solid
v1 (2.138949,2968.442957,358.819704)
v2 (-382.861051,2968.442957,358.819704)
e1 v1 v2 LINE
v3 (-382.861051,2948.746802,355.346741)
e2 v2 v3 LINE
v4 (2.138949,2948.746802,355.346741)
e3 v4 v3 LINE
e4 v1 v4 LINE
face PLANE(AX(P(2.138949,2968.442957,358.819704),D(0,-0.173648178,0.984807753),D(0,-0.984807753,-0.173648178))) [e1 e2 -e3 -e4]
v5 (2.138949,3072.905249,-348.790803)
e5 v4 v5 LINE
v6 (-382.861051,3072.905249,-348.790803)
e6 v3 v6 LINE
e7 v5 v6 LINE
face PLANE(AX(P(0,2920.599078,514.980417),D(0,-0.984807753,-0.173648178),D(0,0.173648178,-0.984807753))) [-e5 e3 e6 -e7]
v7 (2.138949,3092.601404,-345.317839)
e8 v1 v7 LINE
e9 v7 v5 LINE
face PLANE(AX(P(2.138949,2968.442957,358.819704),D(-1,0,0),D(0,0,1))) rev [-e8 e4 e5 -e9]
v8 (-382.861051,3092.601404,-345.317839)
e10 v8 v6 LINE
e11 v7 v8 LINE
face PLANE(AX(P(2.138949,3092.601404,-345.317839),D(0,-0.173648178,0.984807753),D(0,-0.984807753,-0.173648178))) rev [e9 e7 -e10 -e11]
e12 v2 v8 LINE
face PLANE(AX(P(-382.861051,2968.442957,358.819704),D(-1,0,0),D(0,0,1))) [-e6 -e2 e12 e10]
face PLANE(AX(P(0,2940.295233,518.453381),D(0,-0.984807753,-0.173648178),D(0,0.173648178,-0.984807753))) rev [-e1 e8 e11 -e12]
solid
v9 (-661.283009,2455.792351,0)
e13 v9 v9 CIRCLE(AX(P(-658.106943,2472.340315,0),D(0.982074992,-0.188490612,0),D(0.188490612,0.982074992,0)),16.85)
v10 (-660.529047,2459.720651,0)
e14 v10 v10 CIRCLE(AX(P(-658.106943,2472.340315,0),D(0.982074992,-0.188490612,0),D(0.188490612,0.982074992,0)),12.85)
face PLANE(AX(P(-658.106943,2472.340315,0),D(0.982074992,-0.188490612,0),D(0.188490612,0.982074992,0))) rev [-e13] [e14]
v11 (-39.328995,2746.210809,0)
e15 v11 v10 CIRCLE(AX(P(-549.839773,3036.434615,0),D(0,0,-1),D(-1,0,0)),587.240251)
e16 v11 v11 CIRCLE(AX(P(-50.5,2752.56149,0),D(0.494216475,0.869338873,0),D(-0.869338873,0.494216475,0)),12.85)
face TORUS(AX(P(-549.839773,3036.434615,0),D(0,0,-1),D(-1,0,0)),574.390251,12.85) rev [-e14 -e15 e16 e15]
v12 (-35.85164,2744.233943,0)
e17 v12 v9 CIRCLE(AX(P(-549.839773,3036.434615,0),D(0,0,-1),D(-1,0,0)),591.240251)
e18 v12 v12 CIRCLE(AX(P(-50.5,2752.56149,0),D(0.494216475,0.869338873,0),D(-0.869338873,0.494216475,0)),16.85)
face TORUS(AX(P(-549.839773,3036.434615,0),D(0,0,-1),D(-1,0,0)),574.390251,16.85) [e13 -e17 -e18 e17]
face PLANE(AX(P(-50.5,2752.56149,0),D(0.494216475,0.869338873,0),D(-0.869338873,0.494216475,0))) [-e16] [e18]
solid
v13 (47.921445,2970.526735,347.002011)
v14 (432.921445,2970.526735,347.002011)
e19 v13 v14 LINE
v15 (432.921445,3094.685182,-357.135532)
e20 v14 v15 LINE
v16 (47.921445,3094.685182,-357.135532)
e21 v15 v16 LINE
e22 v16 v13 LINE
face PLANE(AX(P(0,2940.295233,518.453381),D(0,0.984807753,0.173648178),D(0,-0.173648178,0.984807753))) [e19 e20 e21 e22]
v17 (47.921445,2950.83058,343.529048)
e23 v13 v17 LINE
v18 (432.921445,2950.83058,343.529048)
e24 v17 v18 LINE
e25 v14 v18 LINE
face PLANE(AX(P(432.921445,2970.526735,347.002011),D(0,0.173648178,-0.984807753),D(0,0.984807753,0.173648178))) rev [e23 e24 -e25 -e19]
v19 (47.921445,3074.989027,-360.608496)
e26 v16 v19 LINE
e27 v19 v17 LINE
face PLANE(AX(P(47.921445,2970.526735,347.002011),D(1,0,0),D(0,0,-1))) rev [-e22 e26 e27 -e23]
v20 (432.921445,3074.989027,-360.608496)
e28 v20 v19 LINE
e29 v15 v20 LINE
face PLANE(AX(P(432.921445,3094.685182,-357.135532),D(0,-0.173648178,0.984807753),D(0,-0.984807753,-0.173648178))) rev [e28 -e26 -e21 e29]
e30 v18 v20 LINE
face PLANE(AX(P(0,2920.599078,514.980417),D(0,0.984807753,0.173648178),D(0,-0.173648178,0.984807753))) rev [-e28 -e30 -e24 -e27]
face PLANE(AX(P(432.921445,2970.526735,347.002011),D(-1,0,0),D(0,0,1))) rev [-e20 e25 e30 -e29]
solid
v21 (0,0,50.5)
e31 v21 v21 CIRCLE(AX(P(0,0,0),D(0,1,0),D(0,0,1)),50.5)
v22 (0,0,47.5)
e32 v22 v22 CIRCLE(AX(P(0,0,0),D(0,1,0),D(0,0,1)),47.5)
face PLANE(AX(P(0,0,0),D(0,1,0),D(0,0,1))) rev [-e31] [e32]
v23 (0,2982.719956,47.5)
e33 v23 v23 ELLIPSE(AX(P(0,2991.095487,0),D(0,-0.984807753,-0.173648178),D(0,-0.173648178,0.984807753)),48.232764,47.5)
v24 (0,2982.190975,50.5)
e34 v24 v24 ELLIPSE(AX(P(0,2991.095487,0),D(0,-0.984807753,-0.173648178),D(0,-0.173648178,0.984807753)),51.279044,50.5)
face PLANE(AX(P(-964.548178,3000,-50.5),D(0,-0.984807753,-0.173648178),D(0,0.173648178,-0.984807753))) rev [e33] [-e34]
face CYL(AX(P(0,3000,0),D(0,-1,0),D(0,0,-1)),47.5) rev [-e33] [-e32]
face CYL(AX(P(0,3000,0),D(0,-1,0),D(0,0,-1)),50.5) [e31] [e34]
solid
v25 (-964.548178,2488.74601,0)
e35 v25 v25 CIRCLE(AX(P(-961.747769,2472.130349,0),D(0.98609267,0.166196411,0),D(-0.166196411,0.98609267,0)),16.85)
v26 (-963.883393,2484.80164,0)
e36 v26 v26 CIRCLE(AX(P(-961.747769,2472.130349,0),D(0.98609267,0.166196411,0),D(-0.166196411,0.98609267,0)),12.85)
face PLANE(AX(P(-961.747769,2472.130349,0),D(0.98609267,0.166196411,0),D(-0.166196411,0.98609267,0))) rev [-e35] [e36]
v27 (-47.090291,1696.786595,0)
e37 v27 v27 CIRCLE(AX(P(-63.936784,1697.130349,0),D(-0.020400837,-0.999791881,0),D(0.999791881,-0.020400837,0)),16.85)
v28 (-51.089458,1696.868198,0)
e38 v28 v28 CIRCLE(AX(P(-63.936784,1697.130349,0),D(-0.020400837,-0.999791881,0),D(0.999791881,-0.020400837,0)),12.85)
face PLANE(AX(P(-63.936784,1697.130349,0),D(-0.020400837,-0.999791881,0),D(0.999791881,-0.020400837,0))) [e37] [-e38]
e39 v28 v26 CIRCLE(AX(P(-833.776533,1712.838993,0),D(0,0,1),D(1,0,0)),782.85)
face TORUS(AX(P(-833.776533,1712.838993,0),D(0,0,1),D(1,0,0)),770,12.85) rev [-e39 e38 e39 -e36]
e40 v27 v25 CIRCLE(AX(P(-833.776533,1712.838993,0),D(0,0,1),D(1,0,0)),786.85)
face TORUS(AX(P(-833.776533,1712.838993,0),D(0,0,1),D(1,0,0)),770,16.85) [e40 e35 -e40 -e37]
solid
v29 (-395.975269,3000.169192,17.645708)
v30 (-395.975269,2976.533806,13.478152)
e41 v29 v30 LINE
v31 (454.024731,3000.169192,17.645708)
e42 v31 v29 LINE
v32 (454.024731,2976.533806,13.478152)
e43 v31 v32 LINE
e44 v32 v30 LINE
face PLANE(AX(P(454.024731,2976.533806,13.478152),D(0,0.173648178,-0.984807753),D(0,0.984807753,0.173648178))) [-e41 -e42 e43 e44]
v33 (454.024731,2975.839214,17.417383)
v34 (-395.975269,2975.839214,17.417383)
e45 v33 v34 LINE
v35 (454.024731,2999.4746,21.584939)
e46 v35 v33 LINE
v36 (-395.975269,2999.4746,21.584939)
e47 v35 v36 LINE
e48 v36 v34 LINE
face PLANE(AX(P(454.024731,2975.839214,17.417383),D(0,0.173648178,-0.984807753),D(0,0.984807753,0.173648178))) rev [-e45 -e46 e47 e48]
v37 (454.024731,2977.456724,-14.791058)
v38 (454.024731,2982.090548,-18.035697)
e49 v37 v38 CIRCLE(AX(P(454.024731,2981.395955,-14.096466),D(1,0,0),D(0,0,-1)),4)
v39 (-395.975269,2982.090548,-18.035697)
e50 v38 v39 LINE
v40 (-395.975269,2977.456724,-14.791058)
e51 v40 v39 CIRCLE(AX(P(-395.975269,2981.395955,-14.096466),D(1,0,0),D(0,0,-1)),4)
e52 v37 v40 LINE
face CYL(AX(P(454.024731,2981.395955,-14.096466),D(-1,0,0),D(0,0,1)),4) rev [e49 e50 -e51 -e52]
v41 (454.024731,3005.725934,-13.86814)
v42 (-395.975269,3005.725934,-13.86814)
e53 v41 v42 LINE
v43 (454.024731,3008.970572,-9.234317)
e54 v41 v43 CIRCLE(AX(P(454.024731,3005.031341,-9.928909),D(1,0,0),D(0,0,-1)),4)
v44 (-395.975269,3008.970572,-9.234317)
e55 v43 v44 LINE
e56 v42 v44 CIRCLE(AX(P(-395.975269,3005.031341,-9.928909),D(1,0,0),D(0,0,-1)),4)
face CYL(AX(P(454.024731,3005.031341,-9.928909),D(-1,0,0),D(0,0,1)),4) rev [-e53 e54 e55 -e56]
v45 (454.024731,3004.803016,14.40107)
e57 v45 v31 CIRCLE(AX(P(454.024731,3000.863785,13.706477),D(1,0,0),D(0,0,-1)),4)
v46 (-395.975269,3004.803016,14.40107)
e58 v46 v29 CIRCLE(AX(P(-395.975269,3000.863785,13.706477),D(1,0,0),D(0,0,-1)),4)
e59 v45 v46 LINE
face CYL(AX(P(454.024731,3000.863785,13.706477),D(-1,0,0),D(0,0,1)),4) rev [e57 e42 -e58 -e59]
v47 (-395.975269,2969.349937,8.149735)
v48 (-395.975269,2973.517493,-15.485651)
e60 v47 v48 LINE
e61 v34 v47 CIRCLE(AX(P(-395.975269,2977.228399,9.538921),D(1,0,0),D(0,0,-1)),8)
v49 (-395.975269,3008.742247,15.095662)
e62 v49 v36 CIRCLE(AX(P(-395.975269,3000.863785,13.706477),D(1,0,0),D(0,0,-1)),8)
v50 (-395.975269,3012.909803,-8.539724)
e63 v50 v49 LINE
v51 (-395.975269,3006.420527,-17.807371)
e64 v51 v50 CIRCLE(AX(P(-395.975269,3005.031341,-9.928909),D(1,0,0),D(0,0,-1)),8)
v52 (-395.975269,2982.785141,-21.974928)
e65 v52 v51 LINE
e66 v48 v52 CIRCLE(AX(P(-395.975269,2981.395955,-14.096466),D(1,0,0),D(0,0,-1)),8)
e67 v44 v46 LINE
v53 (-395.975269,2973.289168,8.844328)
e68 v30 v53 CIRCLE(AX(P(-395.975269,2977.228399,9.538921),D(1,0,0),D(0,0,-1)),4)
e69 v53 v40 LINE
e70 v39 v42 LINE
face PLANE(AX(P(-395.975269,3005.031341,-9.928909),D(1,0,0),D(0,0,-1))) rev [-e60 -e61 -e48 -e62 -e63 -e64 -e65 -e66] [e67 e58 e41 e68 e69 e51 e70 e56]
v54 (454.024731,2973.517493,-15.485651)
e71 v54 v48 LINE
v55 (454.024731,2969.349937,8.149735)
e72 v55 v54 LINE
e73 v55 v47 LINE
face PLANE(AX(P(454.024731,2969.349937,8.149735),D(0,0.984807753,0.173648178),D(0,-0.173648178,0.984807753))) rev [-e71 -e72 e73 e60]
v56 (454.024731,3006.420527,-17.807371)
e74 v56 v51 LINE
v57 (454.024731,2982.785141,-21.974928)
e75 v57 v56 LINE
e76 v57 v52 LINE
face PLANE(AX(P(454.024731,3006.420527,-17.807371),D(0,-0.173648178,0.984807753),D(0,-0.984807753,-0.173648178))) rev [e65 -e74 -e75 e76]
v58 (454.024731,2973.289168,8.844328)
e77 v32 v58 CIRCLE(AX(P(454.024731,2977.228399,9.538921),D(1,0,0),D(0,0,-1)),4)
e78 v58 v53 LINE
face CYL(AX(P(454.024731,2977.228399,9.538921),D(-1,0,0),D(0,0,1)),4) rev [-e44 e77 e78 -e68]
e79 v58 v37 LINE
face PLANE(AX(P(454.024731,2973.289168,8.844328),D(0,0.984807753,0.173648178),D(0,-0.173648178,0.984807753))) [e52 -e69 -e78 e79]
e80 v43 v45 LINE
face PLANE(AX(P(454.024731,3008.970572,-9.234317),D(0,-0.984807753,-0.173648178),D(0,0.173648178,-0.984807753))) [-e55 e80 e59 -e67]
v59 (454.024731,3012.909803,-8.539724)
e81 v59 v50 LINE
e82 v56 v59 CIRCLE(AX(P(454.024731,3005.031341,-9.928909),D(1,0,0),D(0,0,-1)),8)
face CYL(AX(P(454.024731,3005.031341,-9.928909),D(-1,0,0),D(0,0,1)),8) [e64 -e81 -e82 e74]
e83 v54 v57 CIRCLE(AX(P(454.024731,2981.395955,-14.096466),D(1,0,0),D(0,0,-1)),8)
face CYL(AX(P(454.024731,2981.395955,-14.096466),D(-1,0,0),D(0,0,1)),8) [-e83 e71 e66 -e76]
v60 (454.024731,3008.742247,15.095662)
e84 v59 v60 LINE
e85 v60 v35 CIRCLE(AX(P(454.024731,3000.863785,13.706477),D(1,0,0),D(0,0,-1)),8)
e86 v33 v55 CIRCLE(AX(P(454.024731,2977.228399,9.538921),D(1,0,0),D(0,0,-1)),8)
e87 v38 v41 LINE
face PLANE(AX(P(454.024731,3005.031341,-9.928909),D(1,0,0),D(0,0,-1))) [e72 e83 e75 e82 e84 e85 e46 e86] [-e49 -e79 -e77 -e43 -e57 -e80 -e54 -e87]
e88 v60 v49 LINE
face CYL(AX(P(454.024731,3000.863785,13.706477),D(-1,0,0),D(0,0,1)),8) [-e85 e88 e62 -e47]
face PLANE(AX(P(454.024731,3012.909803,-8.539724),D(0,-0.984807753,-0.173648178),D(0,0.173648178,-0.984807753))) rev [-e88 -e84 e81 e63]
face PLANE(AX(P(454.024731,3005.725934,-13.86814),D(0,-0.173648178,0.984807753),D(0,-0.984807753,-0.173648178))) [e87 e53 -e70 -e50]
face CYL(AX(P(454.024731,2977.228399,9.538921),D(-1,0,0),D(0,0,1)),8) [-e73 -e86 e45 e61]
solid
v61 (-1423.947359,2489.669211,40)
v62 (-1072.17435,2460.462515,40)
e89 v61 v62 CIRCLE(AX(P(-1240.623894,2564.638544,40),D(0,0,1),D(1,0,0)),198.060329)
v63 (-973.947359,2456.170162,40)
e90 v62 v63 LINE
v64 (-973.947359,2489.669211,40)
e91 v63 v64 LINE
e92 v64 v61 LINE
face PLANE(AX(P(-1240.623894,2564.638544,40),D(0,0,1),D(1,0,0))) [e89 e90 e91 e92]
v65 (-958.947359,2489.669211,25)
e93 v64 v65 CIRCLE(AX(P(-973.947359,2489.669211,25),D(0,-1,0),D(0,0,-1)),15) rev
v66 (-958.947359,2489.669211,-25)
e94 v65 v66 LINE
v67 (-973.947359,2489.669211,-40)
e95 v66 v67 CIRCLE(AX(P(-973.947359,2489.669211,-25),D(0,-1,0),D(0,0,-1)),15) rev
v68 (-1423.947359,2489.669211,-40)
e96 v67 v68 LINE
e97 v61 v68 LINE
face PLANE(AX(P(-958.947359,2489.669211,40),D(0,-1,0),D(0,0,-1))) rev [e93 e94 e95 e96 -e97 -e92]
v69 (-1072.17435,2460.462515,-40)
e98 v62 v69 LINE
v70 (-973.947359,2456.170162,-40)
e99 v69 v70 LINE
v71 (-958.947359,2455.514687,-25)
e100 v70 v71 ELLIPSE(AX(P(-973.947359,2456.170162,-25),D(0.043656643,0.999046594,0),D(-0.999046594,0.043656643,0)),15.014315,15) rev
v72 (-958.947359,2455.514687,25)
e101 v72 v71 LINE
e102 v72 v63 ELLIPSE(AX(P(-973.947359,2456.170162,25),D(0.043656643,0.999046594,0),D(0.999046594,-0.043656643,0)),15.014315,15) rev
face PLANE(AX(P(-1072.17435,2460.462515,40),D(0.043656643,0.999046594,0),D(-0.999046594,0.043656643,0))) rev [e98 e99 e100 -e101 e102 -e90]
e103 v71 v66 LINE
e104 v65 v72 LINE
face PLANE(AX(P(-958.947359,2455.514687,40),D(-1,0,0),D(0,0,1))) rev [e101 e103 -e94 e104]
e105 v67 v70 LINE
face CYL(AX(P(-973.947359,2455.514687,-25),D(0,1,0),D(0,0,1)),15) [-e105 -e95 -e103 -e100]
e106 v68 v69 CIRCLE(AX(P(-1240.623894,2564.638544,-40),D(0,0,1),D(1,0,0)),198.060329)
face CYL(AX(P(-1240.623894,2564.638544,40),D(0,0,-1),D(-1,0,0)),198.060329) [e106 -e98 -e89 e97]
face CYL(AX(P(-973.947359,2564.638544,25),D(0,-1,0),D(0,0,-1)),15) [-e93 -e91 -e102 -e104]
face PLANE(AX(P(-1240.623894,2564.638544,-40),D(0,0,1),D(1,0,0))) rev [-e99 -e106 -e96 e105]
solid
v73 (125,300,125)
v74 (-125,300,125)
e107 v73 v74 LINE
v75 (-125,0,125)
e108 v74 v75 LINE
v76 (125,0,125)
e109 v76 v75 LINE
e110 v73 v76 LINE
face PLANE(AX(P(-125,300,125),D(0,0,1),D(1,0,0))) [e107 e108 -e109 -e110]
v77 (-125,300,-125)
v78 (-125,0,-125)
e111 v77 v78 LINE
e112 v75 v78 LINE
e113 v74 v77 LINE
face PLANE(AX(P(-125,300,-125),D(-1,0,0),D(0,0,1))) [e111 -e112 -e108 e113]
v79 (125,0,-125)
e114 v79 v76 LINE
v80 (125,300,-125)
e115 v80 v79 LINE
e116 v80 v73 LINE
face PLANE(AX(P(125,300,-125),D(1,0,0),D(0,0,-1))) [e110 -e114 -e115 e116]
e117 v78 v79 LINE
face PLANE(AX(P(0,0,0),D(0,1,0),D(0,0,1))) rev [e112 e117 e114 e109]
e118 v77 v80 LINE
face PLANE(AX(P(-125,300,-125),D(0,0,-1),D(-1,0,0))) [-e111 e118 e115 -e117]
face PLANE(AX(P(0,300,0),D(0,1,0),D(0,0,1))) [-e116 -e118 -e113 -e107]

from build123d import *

# Parameters (mm, degrees)
SKETCH1_R                                  = 50.5
SKETCH1_R_2                                = 47.5
BOSS_EXTRUDE1_DEPTH                        = 3000
PIPE_CONFIGURED_33_7_X_4_0_1_OUTLINE_R     = 16.85
PIPE_CONFIGURED_33_7_X_4_0_1_OUTLINE_R_2   = 12.85
PIPE_CONFIGURED_33_7_X_4_0_1_ANGLE         = 71.246614
PIPE_CONFIGURED_33_7_X_4_0_1_2_OUTLINE_R   = 16.85
PIPE_CONFIGURED_33_7_X_4_0_1_2_OUTLINE_R_2 = 12.85
PIPE_CONFIGURED_33_7_X_4_0_1_2_ANGLE       = 100.735706
CUT_EXTRUDE1_DEPTH                         = 3152.650905186
CUT_EXTRUDE1_DEPTH_BACK                    = 3152.650905186
SQUARE_TUBE_CONFIGURED_40_X_40_X_4_1_DEPTH = 850
SKETCH15_W                                 = 385
SKETCH15_H                                 = 715
BOSS_EXTRUDE3_DEPTH                        = 20
SKETCH16_W                                 = 385
SKETCH16_H                                 = 715
BOSS_EXTRUDE4_DEPTH                        = 20
BOSS_EXTRUDE5_DEPTH                        = 40
FILLET1_R                                  = 15
SKETCH18_W                                 = 250
SKETCH18_H                                 = 250
BOSS_EXTRUDE6_DEPTH                        = 300


# Read off the part's stored shape, not the designer's step: Pipe - configured 33.7 X 4.0(1)
with BuildPart() as part:
    # Sketch1 → Boss-Extrude1 (new body)
    with BuildSketch(Plane(origin=(0, 0, 0), x_dir=(1, 0, 0), z_dir=(0, 1, 0))):
        with Locations(Location((0, 0, 0), (0, 0, 270))):
            Circle(SKETCH1_R)
        with Locations(Location((0, 0, 0), (0, 0, 270))):
            Circle(SKETCH1_R_2, mode=Mode.SUBTRACT)
    extrude(amount=BOSS_EXTRUDE1_DEPTH)

    # Sketch12 → Cut-Extrude1 (cut, two sides: drawn at the far end of the back side and taken through both)
    with BuildSketch(Plane(origin=(0, 0, 0), x_dir=(0, 0, -1), z_dir=(1, 0, 0)).offset(-CUT_EXTRUDE1_DEPTH_BACK)):
        Polygon((50.5, 3000), (-67.81337246, 2979.138160257), (-67.81337246, 3000), align=None)
    extrude(amount=CUT_EXTRUDE1_DEPTH + CUT_EXTRUDE1_DEPTH_BACK, mode=Mode.SUBTRACT)


with BuildPart() as body_2:
    # Pipe - configured 33.7 X 4.0(1) outline → Pipe - configured 33.7 X 4.0(1) (revolve)
    with BuildSketch(Plane(origin=(-549.839773, 3036.434615231, 0), x_dir=(-0.18849061162568545, -0.9820749917032685, 0), z_dir=(-0.9820749917032685, 0.18849061162568545, 0))):
        with Locations((574.390250582, 0)):
            Circle(PIPE_CONFIGURED_33_7_X_4_0_1_OUTLINE_R)
        with Locations((574.390250582, 0)):
            Circle(PIPE_CONFIGURED_33_7_X_4_0_1_OUTLINE_R_2, mode=Mode.SUBTRACT)
    revolve(axis=Axis((-549.839773, 3036.434615231, 0), (0, 0, 1)), revolution_arc=PIPE_CONFIGURED_33_7_X_4_0_1_ANGLE)


with BuildPart() as body_3:
    # Pipe - configured 33.7 X 4.0_1 2 outline → Pipe - configured 33.7 X 4.0_1 2 (revolve)
    with BuildSketch(Plane(origin=(-833.776532631, 1712.838993172, 0), x_dir=(0.9997918812705326, -0.020400836883055794, 0), z_dir=(-0.020400836883055794, -0.9997918812705326, 0))):
        with Locations((770, 0)):
            Circle(PIPE_CONFIGURED_33_7_X_4_0_1_2_OUTLINE_R)
        with Locations((770, 0)):
            Circle(PIPE_CONFIGURED_33_7_X_4_0_1_2_OUTLINE_R_2, mode=Mode.SUBTRACT)
    revolve(axis=Axis((-833.776532631, 1712.838993172, 0), (0, 0, 1)), revolution_arc=PIPE_CONFIGURED_33_7_X_4_0_1_2_ANGLE)


with BuildPart() as body_4:
    # Sketch14 → Square tube - configured 40 X 40 X 4(1) (new body)
    with BuildSketch(Plane(origin=(-395.975268768, 2991.129870244, -0.194994376), x_dir=(0, 0.17364817766692475, -0.984807753012209), z_dir=(1, 0, 0))):
        with BuildLine():
            Line((-12, -20), (12, -20))
            ThreePointArc((12, -20), (17.656854249, -17.656854249), (20, -12))
            Line((20, -12), (20, 12))
            ThreePointArc((20, 12), (17.656854249, 17.656854249), (12, 20))
            Line((12, 20), (-12, 20))
            ThreePointArc((-12, 20), (-17.656854249, 17.656854249), (-20, 12))
            Line((-20, 12), (-20, -12))
            ThreePointArc((-20, -12), (-17.656854249, -17.656854249), (-12, -20))
        make_face()
        with BuildLine():
            Line((-12, -16), (12, -16))
            ThreePointArc((12, -16), (14.828427125, -14.828427125), (16, -12))
            Line((16, -12), (16, 12))
            ThreePointArc((16, 12), (14.828427125, 14.828427125), (12, 16))
            Line((12, 16), (-12, 16))
            ThreePointArc((-12, 16), (-14.828427125, 14.828427125), (-16, 12))
            Line((-16, 12), (-16, -12))
            ThreePointArc((-16, -12), (-14.828427125, -14.828427125), (-12, -16))
        make_face(mode=Mode.SUBTRACT)
    extrude(amount=SQUARE_TUBE_CONFIGURED_40_X_40_X_4_1_DEPTH)


with BuildPart() as body_5:
    # Sketch15 → Boss-Extrude3 (new body)
    with BuildSketch(Plane(origin=(0, 2920.59907762, 514.980417217), x_dir=(1, 0, 0), z_dir=(0, 0.9848077530122089, 0.17364817766692592))):
        with Locations((-190.361050881, 519.596283107)):
            Rectangle(SKETCH15_W, SKETCH15_H)
    extrude(amount=BOSS_EXTRUDE3_DEPTH)


with BuildPart() as body_6:
    # Sketch16 → Boss-Extrude4 (new body)
    with BuildSketch(Plane(origin=(0, 2920.59907762, 514.980417217), x_dir=(1, 0, 0), z_dir=(0, 0.9848077530122089, 0.17364817766692592))):
        with Locations((240.421444589, 531.596283107)):
            Rectangle(SKETCH16_W, SKETCH16_H)
    extrude(amount=BOSS_EXTRUDE4_DEPTH)


with BuildPart() as body_7:
    # Sketch17 → Boss-Extrude5 (new, symmetric)
    with BuildSketch(Plane.XY):
        with BuildLine():
            Line((-958.947359374, 2455.51468729), (-958.947359374, 2489.669210551))
            Line((-958.947359374, 2489.669210551), (-1423.947359374, 2489.669210551))
            ThreePointArc((-1423.947359374, 2489.669210551), (-1257.011881852, 2367.257370091), (-1072.174349577, 2460.462514816))
            Line((-1072.174349577, 2460.462514816), (-958.947359374, 2455.51468729))
        make_face()
    extrude(amount=BOSS_EXTRUDE5_DEPTH, both=True)

    # Fillet1
    fillet1_edges = [body_7.edges().sort_by_distance(p)[0] for p in [
        (-958.947359374, 2472.59194892, -40),
        (-958.947359374, 2472.59194892, 40),
    ]]
    fillet(fillet1_edges, radius=FILLET1_R)


with BuildPart() as body_8:
    # Sketch18 → Boss-Extrude6 (new body)
    with BuildSketch(Plane.XZ):
        Rectangle(SKETCH18_W, SKETCH18_H)
    extrude(amount=-BOSS_EXTRUDE6_DEPTH)


solid = Compound([part.part, body_2.part, body_3.part, body_4.part, body_5.part, body_6.part, body_7.part, body_8.part])
